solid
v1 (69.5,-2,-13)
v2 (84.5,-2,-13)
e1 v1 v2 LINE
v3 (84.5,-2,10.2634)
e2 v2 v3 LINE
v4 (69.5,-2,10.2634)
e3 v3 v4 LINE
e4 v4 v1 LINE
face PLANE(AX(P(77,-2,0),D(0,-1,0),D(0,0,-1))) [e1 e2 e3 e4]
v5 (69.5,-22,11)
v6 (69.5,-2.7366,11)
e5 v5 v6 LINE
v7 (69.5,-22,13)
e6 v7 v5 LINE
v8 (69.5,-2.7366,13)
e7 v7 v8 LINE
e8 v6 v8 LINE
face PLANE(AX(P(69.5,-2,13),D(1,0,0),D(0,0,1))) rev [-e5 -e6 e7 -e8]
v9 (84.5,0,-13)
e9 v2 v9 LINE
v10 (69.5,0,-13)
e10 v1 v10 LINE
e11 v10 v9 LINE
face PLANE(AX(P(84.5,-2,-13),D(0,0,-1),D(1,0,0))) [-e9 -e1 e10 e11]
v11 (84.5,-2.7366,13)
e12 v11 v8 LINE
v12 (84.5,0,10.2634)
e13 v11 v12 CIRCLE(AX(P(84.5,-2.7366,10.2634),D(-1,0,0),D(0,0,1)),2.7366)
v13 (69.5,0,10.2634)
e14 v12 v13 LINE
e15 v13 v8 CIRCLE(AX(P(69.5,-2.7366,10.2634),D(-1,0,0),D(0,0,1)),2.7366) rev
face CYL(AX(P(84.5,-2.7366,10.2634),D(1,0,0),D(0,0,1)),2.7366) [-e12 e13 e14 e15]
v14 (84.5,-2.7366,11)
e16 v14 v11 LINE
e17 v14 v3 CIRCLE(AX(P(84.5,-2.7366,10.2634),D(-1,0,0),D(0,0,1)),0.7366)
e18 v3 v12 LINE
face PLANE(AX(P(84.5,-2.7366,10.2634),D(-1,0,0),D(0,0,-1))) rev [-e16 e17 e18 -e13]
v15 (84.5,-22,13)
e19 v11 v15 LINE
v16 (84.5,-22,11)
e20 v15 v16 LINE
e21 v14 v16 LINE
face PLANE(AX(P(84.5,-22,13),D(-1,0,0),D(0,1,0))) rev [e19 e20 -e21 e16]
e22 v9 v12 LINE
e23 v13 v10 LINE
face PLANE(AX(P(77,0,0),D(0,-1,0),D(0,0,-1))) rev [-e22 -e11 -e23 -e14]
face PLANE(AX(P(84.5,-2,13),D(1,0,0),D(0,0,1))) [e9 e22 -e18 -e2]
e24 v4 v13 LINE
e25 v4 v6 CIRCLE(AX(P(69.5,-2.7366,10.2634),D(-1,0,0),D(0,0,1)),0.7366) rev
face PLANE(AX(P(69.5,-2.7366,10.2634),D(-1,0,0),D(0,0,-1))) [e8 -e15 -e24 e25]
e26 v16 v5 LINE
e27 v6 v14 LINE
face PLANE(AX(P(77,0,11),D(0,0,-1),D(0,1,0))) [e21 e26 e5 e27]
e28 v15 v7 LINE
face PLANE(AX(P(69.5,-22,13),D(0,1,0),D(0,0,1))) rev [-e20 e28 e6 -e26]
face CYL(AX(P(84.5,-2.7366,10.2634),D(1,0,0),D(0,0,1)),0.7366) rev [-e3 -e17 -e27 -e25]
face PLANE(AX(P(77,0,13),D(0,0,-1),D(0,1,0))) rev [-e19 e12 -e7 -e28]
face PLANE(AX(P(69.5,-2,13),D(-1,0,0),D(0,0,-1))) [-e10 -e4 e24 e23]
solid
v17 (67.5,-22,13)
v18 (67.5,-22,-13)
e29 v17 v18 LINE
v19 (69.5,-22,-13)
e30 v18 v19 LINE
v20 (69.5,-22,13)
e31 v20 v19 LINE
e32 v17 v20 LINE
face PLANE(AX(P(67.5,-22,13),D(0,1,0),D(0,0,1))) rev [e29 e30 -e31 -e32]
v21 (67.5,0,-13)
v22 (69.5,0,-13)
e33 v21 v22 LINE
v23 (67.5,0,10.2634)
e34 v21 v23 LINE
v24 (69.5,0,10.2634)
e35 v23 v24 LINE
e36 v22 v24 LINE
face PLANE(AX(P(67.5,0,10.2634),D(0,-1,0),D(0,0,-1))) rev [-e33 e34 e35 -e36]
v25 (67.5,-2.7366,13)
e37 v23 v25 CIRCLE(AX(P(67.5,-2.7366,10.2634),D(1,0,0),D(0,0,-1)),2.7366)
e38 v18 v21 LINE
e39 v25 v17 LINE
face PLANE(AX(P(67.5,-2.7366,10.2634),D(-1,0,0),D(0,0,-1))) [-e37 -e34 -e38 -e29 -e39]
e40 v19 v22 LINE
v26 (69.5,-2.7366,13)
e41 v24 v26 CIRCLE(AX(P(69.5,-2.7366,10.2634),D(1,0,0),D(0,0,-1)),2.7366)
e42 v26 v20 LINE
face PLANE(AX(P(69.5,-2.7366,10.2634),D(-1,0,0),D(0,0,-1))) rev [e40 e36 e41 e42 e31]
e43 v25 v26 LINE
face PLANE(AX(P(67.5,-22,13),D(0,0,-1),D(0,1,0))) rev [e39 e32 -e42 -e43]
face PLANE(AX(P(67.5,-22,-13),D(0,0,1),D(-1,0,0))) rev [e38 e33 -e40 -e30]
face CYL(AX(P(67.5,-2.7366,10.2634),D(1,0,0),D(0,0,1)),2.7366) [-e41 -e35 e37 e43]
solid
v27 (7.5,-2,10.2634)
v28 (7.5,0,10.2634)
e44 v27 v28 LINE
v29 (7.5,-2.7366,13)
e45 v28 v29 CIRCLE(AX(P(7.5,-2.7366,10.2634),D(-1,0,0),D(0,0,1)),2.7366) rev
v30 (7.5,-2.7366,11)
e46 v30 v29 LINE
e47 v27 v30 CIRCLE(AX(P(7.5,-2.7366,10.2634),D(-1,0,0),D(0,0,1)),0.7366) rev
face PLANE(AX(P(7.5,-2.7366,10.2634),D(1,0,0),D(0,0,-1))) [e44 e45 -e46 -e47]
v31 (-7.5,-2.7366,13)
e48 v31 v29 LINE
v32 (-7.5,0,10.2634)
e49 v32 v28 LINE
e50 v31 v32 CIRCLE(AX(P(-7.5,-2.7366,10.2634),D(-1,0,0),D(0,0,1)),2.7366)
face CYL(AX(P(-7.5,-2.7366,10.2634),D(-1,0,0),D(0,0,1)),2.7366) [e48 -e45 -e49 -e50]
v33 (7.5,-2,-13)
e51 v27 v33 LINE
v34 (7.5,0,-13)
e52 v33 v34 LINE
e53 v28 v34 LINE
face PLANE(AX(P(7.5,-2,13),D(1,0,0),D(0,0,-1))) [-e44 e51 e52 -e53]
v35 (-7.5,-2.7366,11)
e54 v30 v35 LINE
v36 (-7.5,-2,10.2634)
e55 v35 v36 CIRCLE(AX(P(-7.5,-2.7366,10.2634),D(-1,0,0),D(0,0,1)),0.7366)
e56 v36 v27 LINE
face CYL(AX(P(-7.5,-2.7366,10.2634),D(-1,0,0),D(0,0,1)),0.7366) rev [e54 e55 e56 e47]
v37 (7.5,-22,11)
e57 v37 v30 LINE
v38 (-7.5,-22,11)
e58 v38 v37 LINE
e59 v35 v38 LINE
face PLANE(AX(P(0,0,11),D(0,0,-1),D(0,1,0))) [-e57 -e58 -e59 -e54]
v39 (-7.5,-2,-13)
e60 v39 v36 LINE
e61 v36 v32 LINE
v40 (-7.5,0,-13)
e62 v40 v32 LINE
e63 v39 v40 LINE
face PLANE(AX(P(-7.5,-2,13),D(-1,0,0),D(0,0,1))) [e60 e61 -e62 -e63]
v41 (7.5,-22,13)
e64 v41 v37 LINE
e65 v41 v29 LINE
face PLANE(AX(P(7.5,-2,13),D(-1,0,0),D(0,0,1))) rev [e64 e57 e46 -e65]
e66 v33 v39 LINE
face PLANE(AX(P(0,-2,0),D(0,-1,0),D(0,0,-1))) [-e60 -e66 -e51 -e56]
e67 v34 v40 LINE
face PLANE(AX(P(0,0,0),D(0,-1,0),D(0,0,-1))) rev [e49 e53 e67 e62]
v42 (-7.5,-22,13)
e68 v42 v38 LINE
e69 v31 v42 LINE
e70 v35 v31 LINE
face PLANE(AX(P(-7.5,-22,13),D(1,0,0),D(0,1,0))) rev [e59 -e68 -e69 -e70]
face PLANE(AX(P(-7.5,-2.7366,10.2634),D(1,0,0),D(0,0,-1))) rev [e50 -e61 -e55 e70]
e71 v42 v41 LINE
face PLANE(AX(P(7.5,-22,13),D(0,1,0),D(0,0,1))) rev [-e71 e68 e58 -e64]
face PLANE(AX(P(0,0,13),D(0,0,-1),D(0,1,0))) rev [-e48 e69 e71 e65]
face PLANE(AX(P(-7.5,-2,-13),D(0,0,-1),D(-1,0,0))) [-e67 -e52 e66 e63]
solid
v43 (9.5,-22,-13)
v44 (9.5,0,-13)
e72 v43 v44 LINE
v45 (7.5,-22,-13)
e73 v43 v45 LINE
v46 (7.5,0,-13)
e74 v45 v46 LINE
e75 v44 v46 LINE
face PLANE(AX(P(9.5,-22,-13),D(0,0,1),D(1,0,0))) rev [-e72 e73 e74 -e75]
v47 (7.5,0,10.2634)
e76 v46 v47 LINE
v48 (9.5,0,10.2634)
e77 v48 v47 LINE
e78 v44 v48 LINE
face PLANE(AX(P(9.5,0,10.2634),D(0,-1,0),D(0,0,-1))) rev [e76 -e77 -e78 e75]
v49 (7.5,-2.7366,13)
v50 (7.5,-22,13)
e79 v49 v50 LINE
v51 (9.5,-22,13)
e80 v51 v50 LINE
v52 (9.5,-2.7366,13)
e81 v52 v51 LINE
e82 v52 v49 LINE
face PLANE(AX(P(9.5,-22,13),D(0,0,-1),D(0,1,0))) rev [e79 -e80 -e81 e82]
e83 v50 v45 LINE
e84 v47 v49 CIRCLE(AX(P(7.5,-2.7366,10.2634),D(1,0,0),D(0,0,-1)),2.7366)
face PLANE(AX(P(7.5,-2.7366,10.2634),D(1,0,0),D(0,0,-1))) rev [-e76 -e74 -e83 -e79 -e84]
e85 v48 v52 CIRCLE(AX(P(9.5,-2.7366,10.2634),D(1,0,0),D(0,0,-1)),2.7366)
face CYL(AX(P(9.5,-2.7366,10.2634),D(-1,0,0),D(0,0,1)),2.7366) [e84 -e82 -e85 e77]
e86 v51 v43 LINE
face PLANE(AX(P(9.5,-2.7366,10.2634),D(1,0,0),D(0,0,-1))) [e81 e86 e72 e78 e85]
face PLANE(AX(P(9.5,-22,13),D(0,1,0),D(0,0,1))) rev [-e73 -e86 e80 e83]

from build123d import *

# Parameters (mm, degrees)
SKETCH1_W                    = 15
SKETCH1_H                    = 26
BASE_FLANGE1_DEPTH           = 2
EDGE_FLANGE1_STRIP_W         = 9.4732
EDGE_FLANGE1_STRIP_H         = 2
EDGE_FLANGE1_STRIP_CUT_DEPTH = 15
EDGE_FLANGE1_DEPTH           = 15
BASE_FLANGE2_START           = 2
BASE_FLANGE2_DEPTH           = 2


# Sheet-metal steps are written as plain solids
with BuildPart() as part:
    # Sketch1 → Base-Flange1 (new body)
    with BuildSketch(Plane(origin=(0, 0, 0), x_dir=(1, 0, 0), z_dir=(0, 1, 0))):
        Rectangle(SKETCH1_W, SKETCH1_H)
    extrude(amount=-BASE_FLANGE1_DEPTH)

    # Edge-Flange1 strip (across the edge) → Edge-Flange1 strip cut (cut)
    with BuildSketch(Plane(origin=(7.5, -2, 13), x_dir=(0, 0, -1), z_dir=(-1, 0, 0))):
        with Locations((-2, -1)):
            Rectangle(EDGE_FLANGE1_STRIP_W, EDGE_FLANGE1_STRIP_H)
    extrude(amount=EDGE_FLANGE1_STRIP_CUT_DEPTH, mode=Mode.SUBTRACT)

    # Edge-Flange1 section (across the edge) → Edge-Flange1 (add)
    with BuildSketch(Plane(origin=(7.5, -2, 13), x_dir=(0, 0, -1), z_dir=(-1, 0, 0))):
        with BuildLine():
            Line((0, 0.7366), (0, 20))
            Line((0, 20), (2, 20))
            Line((2, 20), (2, 0.7366))
            ThreePointArc((2, 0.7366), (2.215745145, 0.215745145), (2.7366, 0))
            Line((2.7366, 0), (2.7366, -2))
            ThreePointArc((2.7366, -2), (0.801531583, -1.198468417), (0, 0.7366))
        make_face()
    extrude(amount=EDGE_FLANGE1_DEPTH)


with BuildPart() as body_2:
    # Sketch9 → Base-Flange2 (new body)
    with BuildSketch(Plane(origin=(7.5, 0, 0), x_dir=(0, 0, -1), z_dir=(1, 0, 0)).offset(BASE_FLANGE2_START)):
        with BuildLine():
            Line((-13, -22), (-13, -2.7366))
            ThreePointArc((-13, -2.7366), (-12.198468417, -0.801531583), (-10.2634, 0))
            Line((-10.2634, 0), (13, 0))
            Line((13, 0), (13, -22))
            Line((13, -22), (-13, -22))
        make_face()
    extrude(amount=-BASE_FLANGE2_DEPTH)


with BuildPart() as body_3:
    # Mirror1: mirrored copy
    add(part.part.mirror(Plane.ZY.offset(-38.5)))


with BuildPart() as body_4:
    # Mirror1 2: mirrored copy
    add(body_2.part.mirror(Plane.ZY.offset(-38.5)))


solid = Compound([part.part, body_2.part, body_3.part, body_4.part])
